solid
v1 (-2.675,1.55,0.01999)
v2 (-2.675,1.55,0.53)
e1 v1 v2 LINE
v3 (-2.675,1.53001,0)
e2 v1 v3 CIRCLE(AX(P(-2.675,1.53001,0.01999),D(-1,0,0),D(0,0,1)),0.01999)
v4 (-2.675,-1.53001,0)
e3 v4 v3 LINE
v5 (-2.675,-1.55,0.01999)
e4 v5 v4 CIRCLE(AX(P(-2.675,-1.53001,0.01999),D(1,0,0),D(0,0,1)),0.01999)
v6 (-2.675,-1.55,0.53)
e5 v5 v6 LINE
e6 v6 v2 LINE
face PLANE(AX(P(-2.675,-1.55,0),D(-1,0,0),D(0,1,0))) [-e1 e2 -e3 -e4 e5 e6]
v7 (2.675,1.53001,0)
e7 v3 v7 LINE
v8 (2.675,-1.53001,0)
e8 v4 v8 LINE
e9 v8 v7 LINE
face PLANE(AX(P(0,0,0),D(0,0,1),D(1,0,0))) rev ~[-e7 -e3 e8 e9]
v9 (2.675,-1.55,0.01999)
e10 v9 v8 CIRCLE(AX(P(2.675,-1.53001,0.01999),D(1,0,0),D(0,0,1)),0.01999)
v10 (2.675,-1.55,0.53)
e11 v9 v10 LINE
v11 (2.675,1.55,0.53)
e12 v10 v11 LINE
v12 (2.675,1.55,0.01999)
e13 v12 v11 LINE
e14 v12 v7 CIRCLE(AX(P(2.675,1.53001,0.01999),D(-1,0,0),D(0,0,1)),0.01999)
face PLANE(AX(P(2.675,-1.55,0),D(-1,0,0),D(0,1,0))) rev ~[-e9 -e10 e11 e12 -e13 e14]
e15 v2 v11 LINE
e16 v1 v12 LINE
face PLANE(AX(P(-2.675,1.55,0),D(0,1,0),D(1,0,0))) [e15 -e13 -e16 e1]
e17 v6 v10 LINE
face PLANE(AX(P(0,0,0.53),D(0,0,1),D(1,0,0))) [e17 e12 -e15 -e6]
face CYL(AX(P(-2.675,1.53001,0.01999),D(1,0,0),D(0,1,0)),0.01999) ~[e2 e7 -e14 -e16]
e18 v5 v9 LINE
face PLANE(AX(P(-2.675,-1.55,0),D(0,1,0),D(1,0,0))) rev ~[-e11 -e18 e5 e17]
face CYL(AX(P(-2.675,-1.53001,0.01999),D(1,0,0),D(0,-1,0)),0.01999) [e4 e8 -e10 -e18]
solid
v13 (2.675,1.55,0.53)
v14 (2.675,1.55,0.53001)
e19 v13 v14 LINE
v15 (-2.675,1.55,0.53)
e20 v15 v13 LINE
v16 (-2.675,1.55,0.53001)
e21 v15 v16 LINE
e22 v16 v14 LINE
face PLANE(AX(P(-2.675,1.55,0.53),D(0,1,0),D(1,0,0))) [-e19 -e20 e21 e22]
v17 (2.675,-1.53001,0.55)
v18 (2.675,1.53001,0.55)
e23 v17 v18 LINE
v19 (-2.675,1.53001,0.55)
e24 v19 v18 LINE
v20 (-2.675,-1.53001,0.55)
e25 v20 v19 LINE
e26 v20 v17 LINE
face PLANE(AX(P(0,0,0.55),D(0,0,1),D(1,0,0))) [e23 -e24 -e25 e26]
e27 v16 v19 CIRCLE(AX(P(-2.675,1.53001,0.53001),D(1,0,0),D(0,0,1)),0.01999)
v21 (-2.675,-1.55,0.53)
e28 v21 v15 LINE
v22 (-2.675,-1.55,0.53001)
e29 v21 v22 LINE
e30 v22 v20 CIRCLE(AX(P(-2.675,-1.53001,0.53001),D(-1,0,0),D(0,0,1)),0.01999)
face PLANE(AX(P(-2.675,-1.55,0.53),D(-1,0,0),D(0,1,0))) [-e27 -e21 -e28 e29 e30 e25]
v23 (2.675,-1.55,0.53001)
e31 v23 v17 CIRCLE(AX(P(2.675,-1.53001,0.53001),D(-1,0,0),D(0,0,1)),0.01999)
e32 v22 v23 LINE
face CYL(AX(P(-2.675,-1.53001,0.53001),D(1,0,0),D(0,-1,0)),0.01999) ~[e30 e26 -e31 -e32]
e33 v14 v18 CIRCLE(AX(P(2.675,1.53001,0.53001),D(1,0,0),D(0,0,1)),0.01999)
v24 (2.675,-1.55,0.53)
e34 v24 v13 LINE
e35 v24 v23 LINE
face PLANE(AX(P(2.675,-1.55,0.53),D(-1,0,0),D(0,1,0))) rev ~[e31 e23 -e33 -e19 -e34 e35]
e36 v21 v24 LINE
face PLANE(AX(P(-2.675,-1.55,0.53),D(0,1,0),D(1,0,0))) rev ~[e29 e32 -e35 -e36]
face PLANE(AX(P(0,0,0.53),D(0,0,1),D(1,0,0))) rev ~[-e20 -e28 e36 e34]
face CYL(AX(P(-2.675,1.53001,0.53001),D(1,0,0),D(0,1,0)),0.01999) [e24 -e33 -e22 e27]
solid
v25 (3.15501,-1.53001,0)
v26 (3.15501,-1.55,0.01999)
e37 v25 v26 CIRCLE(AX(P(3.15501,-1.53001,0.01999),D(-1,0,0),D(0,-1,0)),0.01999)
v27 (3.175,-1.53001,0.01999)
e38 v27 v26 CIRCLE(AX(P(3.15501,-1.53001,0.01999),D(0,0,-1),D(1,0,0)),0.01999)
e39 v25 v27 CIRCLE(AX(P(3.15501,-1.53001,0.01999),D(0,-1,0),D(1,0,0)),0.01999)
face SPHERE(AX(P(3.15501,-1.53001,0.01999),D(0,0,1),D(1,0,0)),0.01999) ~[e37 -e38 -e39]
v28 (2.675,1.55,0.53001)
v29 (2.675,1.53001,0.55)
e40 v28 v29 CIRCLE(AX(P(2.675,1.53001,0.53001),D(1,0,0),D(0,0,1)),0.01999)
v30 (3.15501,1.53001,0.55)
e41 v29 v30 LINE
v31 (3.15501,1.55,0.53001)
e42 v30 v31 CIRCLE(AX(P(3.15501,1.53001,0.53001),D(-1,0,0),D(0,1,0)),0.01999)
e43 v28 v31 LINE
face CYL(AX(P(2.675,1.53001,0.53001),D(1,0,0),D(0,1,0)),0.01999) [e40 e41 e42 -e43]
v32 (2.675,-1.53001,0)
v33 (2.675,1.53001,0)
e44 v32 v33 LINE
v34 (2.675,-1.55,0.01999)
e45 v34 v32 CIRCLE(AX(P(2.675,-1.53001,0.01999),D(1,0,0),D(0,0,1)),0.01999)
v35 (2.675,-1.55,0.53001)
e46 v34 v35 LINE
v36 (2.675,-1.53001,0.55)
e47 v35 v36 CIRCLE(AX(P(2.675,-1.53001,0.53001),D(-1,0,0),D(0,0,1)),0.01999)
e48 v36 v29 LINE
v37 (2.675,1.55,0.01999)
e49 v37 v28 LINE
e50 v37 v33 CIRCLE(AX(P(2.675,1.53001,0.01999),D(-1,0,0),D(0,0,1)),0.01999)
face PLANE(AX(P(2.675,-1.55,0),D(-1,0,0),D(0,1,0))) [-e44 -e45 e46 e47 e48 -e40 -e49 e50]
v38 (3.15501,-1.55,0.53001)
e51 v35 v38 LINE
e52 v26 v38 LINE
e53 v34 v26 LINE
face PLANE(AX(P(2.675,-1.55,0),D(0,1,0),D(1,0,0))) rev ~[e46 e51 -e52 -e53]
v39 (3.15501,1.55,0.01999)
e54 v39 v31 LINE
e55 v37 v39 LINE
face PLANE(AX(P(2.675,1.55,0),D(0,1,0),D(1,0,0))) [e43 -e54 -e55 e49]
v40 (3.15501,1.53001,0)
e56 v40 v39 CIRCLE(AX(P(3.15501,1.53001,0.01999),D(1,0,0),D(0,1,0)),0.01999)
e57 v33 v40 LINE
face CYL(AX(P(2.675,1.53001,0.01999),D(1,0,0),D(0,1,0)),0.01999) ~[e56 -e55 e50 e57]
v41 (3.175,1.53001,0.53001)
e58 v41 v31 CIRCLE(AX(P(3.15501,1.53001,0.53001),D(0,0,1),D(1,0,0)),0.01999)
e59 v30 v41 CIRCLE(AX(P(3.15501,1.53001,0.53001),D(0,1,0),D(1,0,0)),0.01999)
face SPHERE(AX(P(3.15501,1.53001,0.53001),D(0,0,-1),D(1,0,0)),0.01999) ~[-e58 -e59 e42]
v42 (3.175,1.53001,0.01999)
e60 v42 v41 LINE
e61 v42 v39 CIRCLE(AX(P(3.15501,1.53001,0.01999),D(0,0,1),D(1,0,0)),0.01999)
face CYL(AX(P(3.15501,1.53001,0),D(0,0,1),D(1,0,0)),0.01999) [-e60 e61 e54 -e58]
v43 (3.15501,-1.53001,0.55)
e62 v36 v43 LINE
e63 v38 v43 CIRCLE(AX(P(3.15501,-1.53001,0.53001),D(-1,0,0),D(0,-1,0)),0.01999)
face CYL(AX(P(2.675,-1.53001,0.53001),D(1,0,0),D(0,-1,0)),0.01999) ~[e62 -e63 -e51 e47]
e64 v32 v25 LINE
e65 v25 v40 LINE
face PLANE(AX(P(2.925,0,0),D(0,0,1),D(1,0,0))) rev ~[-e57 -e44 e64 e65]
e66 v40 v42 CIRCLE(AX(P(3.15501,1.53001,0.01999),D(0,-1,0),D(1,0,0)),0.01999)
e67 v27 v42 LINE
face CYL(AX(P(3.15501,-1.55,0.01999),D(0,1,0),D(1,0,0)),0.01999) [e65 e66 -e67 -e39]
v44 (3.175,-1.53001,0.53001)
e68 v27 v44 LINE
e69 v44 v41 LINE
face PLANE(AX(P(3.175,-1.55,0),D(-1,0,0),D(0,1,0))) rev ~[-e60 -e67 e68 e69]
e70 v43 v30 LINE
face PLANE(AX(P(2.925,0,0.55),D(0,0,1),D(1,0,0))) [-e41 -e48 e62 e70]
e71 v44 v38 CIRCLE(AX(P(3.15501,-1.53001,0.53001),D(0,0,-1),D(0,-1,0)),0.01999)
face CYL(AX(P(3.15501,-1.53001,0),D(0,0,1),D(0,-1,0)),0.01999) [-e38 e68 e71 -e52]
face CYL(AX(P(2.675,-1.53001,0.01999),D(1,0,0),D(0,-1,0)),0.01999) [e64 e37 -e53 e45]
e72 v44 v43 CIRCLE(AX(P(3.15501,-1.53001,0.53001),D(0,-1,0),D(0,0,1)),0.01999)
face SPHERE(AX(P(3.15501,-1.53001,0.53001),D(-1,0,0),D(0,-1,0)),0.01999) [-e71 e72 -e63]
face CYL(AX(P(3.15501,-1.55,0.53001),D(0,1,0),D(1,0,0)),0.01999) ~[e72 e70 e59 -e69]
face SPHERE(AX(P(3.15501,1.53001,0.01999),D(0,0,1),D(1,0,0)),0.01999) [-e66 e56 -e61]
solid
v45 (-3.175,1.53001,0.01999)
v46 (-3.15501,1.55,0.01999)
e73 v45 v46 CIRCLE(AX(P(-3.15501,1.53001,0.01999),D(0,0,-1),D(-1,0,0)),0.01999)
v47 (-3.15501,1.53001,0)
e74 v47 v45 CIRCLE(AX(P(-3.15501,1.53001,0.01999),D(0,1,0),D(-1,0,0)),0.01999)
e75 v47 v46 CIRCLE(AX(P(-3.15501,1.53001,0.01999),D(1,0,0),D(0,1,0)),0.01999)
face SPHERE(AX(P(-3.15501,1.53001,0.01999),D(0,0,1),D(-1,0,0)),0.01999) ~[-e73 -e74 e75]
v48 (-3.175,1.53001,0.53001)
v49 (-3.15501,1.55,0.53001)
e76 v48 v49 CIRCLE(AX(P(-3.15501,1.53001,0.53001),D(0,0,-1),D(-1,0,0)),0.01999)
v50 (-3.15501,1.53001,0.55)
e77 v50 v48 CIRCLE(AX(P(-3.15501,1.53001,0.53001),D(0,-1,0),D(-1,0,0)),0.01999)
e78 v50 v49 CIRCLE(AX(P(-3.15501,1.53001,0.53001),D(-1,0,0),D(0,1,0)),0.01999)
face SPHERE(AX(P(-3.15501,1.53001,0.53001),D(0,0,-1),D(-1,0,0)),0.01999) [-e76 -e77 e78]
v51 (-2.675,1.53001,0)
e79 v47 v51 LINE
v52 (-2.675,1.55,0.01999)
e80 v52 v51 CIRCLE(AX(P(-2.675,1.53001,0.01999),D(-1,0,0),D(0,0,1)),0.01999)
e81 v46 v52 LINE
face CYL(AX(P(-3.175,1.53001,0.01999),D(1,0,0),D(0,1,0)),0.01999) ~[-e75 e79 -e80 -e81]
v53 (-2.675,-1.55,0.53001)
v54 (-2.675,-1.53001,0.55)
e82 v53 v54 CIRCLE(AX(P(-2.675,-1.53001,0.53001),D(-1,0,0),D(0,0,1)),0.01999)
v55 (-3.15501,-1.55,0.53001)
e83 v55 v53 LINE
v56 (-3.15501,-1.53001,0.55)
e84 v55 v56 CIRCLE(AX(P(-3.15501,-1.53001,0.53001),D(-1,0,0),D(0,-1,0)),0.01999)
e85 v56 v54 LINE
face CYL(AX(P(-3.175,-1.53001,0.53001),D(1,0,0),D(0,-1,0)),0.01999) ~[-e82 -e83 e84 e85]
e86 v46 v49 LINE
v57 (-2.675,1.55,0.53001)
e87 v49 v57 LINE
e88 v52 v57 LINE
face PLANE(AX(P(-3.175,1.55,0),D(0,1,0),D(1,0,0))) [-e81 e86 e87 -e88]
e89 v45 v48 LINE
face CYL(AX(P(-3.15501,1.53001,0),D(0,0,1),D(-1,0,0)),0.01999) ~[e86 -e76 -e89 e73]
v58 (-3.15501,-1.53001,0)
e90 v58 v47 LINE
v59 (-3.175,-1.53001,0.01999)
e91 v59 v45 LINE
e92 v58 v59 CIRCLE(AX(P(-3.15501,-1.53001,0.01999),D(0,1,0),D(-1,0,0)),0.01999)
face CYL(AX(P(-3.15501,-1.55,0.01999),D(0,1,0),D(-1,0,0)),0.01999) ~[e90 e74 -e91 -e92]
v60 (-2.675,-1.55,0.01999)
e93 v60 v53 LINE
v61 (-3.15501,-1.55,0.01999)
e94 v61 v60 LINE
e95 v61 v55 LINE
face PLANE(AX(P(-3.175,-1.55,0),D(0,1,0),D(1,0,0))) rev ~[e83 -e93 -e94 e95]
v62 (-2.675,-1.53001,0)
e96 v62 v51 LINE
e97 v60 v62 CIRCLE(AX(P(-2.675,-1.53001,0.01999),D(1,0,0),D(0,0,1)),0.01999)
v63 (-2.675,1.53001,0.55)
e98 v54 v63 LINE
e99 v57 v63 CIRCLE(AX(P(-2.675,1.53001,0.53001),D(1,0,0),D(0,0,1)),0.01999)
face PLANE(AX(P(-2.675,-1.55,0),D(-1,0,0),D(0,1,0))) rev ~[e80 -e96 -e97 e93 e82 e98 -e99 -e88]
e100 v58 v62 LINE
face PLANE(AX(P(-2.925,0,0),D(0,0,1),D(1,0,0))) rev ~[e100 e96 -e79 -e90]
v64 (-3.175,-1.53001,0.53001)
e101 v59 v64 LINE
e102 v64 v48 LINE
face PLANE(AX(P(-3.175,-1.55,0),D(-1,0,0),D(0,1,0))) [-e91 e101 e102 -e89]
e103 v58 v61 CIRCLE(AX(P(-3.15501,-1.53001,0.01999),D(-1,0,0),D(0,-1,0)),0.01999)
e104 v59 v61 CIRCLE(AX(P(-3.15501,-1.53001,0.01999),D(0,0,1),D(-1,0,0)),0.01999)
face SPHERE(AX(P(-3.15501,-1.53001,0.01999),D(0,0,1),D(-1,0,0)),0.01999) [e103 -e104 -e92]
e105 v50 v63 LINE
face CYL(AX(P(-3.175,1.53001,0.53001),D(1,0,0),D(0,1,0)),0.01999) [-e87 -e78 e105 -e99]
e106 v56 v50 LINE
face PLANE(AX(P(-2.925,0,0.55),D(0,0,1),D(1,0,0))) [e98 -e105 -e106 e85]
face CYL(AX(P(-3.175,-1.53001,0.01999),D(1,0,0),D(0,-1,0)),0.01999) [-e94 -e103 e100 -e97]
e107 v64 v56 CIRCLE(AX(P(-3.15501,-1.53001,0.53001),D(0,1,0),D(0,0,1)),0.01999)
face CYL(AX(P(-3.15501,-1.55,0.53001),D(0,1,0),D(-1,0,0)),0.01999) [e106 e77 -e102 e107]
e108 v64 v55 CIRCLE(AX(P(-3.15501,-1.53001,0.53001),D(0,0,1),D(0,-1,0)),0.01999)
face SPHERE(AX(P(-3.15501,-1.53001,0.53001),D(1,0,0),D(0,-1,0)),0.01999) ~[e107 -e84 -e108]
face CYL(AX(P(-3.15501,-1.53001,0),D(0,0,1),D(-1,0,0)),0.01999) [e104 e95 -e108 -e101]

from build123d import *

# Parameters (mm, degrees)
F2_W     = 5.35
F2_H     = 3.1
F3_DEPTH = 0.53
F2_W_2   = 0.5
F4_DEPTH = 0.55
F5_DEPTH = 0.55
F6_DEPTH = 0.02
F7_R     = 0.01999
F7_2_R   = 0.01999
F7_3_R   = 0.01999
F7_4_R   = 0.01999


# Not quite as in the source:
# - a fillet or chamfer is up to 0.001 mm smaller than in the source, because OpenCascade refuses the exact size


with BuildPart() as f3:
    # F2 (on Top) → F3 (new body)
    with BuildSketch(Plane.XY):
        Rectangle(F2_W, F2_H)
    extrude(amount=F3_DEPTH)


with BuildPart() as f4:
    # F2 (on Top) → F4 (new body)
    with BuildSketch(Plane.XY):
        with Locations((-2.925, 0)):
            Rectangle(F2_W_2, F2_H)
    extrude(amount=F4_DEPTH)

    # F7 (radius 0.02 in the source; OpenCascade refuses exactly that, so slightly less here)
    f7_edges = [f4.edges().sort_by_distance(p)[0] for p in [
        (-2.925, -1.55, 0.55),
        (-3.175, 1.55, 0.275),
        (-3.175, -1.55, 0.275),
        (-3.175, 0, 0),
        (-3.175, 0, 0.55),
        (-2.925, 1.55, 0.55),
        (-2.925, 1.55, 0),
        (-2.925, -1.55, 0),
    ]]
    fillet(f7_edges, radius=F7_R)


with BuildPart() as f5:
    # F2 (on Top) → F5 (new body)
    with BuildSketch(Plane.XY):
        with Locations((2.925, 0)):
            Rectangle(F2_W_2, F2_H)
    extrude(amount=F5_DEPTH)

    # F7#2 (radius 0.02 in the source; OpenCascade refuses exactly that, so slightly less here)
    f7_2_edges = [f5.edges().sort_by_distance(p)[0] for p in [
        (2.925, -1.55, 0.55),
        (3.175, -1.55, 0.275),
        (3.175, 1.55, 0.275),
        (3.175, 0, 0),
        (3.175, 0, 0.55),
        (2.925, 1.55, 0.55),
        (2.925, 1.55, 0),
        (2.925, -1.55, 0),
    ]]
    fillet(f7_2_edges, radius=F7_2_R)


with BuildPart() as f6:
    # F6 (new): a face of the model
    f6_faces = [f3.part.faces().sort_by_distance(p)[0] for p in [
        (0, 0, 0.53),
    ]]
    extrude(f6_faces, amount=F6_DEPTH)

    # F7#4 (radius 0.02 in the source; OpenCascade refuses exactly that, so slightly less here)
    f7_4_edges = [f6.edges().sort_by_distance(p)[0] for p in [
        (0, -1.55, 0.55),
        (0, 1.55, 0.55),
    ]]
    fillet(f7_4_edges, radius=F7_4_R)


with BuildPart() as f3_1:
    add(f3.part)

    # F7#3 (radius 0.02 in the source; OpenCascade refuses exactly that, so slightly less here)
    f7_3_edges = [f3_1.edges().sort_by_distance(p)[0] for p in [
        (0, 1.55, 0),
        (0, -1.55, 0),
    ]]
    fillet(f7_3_edges, radius=F7_3_R)


solid = Compound([f4.part, f5.part, f6.part, f3_1.part])
